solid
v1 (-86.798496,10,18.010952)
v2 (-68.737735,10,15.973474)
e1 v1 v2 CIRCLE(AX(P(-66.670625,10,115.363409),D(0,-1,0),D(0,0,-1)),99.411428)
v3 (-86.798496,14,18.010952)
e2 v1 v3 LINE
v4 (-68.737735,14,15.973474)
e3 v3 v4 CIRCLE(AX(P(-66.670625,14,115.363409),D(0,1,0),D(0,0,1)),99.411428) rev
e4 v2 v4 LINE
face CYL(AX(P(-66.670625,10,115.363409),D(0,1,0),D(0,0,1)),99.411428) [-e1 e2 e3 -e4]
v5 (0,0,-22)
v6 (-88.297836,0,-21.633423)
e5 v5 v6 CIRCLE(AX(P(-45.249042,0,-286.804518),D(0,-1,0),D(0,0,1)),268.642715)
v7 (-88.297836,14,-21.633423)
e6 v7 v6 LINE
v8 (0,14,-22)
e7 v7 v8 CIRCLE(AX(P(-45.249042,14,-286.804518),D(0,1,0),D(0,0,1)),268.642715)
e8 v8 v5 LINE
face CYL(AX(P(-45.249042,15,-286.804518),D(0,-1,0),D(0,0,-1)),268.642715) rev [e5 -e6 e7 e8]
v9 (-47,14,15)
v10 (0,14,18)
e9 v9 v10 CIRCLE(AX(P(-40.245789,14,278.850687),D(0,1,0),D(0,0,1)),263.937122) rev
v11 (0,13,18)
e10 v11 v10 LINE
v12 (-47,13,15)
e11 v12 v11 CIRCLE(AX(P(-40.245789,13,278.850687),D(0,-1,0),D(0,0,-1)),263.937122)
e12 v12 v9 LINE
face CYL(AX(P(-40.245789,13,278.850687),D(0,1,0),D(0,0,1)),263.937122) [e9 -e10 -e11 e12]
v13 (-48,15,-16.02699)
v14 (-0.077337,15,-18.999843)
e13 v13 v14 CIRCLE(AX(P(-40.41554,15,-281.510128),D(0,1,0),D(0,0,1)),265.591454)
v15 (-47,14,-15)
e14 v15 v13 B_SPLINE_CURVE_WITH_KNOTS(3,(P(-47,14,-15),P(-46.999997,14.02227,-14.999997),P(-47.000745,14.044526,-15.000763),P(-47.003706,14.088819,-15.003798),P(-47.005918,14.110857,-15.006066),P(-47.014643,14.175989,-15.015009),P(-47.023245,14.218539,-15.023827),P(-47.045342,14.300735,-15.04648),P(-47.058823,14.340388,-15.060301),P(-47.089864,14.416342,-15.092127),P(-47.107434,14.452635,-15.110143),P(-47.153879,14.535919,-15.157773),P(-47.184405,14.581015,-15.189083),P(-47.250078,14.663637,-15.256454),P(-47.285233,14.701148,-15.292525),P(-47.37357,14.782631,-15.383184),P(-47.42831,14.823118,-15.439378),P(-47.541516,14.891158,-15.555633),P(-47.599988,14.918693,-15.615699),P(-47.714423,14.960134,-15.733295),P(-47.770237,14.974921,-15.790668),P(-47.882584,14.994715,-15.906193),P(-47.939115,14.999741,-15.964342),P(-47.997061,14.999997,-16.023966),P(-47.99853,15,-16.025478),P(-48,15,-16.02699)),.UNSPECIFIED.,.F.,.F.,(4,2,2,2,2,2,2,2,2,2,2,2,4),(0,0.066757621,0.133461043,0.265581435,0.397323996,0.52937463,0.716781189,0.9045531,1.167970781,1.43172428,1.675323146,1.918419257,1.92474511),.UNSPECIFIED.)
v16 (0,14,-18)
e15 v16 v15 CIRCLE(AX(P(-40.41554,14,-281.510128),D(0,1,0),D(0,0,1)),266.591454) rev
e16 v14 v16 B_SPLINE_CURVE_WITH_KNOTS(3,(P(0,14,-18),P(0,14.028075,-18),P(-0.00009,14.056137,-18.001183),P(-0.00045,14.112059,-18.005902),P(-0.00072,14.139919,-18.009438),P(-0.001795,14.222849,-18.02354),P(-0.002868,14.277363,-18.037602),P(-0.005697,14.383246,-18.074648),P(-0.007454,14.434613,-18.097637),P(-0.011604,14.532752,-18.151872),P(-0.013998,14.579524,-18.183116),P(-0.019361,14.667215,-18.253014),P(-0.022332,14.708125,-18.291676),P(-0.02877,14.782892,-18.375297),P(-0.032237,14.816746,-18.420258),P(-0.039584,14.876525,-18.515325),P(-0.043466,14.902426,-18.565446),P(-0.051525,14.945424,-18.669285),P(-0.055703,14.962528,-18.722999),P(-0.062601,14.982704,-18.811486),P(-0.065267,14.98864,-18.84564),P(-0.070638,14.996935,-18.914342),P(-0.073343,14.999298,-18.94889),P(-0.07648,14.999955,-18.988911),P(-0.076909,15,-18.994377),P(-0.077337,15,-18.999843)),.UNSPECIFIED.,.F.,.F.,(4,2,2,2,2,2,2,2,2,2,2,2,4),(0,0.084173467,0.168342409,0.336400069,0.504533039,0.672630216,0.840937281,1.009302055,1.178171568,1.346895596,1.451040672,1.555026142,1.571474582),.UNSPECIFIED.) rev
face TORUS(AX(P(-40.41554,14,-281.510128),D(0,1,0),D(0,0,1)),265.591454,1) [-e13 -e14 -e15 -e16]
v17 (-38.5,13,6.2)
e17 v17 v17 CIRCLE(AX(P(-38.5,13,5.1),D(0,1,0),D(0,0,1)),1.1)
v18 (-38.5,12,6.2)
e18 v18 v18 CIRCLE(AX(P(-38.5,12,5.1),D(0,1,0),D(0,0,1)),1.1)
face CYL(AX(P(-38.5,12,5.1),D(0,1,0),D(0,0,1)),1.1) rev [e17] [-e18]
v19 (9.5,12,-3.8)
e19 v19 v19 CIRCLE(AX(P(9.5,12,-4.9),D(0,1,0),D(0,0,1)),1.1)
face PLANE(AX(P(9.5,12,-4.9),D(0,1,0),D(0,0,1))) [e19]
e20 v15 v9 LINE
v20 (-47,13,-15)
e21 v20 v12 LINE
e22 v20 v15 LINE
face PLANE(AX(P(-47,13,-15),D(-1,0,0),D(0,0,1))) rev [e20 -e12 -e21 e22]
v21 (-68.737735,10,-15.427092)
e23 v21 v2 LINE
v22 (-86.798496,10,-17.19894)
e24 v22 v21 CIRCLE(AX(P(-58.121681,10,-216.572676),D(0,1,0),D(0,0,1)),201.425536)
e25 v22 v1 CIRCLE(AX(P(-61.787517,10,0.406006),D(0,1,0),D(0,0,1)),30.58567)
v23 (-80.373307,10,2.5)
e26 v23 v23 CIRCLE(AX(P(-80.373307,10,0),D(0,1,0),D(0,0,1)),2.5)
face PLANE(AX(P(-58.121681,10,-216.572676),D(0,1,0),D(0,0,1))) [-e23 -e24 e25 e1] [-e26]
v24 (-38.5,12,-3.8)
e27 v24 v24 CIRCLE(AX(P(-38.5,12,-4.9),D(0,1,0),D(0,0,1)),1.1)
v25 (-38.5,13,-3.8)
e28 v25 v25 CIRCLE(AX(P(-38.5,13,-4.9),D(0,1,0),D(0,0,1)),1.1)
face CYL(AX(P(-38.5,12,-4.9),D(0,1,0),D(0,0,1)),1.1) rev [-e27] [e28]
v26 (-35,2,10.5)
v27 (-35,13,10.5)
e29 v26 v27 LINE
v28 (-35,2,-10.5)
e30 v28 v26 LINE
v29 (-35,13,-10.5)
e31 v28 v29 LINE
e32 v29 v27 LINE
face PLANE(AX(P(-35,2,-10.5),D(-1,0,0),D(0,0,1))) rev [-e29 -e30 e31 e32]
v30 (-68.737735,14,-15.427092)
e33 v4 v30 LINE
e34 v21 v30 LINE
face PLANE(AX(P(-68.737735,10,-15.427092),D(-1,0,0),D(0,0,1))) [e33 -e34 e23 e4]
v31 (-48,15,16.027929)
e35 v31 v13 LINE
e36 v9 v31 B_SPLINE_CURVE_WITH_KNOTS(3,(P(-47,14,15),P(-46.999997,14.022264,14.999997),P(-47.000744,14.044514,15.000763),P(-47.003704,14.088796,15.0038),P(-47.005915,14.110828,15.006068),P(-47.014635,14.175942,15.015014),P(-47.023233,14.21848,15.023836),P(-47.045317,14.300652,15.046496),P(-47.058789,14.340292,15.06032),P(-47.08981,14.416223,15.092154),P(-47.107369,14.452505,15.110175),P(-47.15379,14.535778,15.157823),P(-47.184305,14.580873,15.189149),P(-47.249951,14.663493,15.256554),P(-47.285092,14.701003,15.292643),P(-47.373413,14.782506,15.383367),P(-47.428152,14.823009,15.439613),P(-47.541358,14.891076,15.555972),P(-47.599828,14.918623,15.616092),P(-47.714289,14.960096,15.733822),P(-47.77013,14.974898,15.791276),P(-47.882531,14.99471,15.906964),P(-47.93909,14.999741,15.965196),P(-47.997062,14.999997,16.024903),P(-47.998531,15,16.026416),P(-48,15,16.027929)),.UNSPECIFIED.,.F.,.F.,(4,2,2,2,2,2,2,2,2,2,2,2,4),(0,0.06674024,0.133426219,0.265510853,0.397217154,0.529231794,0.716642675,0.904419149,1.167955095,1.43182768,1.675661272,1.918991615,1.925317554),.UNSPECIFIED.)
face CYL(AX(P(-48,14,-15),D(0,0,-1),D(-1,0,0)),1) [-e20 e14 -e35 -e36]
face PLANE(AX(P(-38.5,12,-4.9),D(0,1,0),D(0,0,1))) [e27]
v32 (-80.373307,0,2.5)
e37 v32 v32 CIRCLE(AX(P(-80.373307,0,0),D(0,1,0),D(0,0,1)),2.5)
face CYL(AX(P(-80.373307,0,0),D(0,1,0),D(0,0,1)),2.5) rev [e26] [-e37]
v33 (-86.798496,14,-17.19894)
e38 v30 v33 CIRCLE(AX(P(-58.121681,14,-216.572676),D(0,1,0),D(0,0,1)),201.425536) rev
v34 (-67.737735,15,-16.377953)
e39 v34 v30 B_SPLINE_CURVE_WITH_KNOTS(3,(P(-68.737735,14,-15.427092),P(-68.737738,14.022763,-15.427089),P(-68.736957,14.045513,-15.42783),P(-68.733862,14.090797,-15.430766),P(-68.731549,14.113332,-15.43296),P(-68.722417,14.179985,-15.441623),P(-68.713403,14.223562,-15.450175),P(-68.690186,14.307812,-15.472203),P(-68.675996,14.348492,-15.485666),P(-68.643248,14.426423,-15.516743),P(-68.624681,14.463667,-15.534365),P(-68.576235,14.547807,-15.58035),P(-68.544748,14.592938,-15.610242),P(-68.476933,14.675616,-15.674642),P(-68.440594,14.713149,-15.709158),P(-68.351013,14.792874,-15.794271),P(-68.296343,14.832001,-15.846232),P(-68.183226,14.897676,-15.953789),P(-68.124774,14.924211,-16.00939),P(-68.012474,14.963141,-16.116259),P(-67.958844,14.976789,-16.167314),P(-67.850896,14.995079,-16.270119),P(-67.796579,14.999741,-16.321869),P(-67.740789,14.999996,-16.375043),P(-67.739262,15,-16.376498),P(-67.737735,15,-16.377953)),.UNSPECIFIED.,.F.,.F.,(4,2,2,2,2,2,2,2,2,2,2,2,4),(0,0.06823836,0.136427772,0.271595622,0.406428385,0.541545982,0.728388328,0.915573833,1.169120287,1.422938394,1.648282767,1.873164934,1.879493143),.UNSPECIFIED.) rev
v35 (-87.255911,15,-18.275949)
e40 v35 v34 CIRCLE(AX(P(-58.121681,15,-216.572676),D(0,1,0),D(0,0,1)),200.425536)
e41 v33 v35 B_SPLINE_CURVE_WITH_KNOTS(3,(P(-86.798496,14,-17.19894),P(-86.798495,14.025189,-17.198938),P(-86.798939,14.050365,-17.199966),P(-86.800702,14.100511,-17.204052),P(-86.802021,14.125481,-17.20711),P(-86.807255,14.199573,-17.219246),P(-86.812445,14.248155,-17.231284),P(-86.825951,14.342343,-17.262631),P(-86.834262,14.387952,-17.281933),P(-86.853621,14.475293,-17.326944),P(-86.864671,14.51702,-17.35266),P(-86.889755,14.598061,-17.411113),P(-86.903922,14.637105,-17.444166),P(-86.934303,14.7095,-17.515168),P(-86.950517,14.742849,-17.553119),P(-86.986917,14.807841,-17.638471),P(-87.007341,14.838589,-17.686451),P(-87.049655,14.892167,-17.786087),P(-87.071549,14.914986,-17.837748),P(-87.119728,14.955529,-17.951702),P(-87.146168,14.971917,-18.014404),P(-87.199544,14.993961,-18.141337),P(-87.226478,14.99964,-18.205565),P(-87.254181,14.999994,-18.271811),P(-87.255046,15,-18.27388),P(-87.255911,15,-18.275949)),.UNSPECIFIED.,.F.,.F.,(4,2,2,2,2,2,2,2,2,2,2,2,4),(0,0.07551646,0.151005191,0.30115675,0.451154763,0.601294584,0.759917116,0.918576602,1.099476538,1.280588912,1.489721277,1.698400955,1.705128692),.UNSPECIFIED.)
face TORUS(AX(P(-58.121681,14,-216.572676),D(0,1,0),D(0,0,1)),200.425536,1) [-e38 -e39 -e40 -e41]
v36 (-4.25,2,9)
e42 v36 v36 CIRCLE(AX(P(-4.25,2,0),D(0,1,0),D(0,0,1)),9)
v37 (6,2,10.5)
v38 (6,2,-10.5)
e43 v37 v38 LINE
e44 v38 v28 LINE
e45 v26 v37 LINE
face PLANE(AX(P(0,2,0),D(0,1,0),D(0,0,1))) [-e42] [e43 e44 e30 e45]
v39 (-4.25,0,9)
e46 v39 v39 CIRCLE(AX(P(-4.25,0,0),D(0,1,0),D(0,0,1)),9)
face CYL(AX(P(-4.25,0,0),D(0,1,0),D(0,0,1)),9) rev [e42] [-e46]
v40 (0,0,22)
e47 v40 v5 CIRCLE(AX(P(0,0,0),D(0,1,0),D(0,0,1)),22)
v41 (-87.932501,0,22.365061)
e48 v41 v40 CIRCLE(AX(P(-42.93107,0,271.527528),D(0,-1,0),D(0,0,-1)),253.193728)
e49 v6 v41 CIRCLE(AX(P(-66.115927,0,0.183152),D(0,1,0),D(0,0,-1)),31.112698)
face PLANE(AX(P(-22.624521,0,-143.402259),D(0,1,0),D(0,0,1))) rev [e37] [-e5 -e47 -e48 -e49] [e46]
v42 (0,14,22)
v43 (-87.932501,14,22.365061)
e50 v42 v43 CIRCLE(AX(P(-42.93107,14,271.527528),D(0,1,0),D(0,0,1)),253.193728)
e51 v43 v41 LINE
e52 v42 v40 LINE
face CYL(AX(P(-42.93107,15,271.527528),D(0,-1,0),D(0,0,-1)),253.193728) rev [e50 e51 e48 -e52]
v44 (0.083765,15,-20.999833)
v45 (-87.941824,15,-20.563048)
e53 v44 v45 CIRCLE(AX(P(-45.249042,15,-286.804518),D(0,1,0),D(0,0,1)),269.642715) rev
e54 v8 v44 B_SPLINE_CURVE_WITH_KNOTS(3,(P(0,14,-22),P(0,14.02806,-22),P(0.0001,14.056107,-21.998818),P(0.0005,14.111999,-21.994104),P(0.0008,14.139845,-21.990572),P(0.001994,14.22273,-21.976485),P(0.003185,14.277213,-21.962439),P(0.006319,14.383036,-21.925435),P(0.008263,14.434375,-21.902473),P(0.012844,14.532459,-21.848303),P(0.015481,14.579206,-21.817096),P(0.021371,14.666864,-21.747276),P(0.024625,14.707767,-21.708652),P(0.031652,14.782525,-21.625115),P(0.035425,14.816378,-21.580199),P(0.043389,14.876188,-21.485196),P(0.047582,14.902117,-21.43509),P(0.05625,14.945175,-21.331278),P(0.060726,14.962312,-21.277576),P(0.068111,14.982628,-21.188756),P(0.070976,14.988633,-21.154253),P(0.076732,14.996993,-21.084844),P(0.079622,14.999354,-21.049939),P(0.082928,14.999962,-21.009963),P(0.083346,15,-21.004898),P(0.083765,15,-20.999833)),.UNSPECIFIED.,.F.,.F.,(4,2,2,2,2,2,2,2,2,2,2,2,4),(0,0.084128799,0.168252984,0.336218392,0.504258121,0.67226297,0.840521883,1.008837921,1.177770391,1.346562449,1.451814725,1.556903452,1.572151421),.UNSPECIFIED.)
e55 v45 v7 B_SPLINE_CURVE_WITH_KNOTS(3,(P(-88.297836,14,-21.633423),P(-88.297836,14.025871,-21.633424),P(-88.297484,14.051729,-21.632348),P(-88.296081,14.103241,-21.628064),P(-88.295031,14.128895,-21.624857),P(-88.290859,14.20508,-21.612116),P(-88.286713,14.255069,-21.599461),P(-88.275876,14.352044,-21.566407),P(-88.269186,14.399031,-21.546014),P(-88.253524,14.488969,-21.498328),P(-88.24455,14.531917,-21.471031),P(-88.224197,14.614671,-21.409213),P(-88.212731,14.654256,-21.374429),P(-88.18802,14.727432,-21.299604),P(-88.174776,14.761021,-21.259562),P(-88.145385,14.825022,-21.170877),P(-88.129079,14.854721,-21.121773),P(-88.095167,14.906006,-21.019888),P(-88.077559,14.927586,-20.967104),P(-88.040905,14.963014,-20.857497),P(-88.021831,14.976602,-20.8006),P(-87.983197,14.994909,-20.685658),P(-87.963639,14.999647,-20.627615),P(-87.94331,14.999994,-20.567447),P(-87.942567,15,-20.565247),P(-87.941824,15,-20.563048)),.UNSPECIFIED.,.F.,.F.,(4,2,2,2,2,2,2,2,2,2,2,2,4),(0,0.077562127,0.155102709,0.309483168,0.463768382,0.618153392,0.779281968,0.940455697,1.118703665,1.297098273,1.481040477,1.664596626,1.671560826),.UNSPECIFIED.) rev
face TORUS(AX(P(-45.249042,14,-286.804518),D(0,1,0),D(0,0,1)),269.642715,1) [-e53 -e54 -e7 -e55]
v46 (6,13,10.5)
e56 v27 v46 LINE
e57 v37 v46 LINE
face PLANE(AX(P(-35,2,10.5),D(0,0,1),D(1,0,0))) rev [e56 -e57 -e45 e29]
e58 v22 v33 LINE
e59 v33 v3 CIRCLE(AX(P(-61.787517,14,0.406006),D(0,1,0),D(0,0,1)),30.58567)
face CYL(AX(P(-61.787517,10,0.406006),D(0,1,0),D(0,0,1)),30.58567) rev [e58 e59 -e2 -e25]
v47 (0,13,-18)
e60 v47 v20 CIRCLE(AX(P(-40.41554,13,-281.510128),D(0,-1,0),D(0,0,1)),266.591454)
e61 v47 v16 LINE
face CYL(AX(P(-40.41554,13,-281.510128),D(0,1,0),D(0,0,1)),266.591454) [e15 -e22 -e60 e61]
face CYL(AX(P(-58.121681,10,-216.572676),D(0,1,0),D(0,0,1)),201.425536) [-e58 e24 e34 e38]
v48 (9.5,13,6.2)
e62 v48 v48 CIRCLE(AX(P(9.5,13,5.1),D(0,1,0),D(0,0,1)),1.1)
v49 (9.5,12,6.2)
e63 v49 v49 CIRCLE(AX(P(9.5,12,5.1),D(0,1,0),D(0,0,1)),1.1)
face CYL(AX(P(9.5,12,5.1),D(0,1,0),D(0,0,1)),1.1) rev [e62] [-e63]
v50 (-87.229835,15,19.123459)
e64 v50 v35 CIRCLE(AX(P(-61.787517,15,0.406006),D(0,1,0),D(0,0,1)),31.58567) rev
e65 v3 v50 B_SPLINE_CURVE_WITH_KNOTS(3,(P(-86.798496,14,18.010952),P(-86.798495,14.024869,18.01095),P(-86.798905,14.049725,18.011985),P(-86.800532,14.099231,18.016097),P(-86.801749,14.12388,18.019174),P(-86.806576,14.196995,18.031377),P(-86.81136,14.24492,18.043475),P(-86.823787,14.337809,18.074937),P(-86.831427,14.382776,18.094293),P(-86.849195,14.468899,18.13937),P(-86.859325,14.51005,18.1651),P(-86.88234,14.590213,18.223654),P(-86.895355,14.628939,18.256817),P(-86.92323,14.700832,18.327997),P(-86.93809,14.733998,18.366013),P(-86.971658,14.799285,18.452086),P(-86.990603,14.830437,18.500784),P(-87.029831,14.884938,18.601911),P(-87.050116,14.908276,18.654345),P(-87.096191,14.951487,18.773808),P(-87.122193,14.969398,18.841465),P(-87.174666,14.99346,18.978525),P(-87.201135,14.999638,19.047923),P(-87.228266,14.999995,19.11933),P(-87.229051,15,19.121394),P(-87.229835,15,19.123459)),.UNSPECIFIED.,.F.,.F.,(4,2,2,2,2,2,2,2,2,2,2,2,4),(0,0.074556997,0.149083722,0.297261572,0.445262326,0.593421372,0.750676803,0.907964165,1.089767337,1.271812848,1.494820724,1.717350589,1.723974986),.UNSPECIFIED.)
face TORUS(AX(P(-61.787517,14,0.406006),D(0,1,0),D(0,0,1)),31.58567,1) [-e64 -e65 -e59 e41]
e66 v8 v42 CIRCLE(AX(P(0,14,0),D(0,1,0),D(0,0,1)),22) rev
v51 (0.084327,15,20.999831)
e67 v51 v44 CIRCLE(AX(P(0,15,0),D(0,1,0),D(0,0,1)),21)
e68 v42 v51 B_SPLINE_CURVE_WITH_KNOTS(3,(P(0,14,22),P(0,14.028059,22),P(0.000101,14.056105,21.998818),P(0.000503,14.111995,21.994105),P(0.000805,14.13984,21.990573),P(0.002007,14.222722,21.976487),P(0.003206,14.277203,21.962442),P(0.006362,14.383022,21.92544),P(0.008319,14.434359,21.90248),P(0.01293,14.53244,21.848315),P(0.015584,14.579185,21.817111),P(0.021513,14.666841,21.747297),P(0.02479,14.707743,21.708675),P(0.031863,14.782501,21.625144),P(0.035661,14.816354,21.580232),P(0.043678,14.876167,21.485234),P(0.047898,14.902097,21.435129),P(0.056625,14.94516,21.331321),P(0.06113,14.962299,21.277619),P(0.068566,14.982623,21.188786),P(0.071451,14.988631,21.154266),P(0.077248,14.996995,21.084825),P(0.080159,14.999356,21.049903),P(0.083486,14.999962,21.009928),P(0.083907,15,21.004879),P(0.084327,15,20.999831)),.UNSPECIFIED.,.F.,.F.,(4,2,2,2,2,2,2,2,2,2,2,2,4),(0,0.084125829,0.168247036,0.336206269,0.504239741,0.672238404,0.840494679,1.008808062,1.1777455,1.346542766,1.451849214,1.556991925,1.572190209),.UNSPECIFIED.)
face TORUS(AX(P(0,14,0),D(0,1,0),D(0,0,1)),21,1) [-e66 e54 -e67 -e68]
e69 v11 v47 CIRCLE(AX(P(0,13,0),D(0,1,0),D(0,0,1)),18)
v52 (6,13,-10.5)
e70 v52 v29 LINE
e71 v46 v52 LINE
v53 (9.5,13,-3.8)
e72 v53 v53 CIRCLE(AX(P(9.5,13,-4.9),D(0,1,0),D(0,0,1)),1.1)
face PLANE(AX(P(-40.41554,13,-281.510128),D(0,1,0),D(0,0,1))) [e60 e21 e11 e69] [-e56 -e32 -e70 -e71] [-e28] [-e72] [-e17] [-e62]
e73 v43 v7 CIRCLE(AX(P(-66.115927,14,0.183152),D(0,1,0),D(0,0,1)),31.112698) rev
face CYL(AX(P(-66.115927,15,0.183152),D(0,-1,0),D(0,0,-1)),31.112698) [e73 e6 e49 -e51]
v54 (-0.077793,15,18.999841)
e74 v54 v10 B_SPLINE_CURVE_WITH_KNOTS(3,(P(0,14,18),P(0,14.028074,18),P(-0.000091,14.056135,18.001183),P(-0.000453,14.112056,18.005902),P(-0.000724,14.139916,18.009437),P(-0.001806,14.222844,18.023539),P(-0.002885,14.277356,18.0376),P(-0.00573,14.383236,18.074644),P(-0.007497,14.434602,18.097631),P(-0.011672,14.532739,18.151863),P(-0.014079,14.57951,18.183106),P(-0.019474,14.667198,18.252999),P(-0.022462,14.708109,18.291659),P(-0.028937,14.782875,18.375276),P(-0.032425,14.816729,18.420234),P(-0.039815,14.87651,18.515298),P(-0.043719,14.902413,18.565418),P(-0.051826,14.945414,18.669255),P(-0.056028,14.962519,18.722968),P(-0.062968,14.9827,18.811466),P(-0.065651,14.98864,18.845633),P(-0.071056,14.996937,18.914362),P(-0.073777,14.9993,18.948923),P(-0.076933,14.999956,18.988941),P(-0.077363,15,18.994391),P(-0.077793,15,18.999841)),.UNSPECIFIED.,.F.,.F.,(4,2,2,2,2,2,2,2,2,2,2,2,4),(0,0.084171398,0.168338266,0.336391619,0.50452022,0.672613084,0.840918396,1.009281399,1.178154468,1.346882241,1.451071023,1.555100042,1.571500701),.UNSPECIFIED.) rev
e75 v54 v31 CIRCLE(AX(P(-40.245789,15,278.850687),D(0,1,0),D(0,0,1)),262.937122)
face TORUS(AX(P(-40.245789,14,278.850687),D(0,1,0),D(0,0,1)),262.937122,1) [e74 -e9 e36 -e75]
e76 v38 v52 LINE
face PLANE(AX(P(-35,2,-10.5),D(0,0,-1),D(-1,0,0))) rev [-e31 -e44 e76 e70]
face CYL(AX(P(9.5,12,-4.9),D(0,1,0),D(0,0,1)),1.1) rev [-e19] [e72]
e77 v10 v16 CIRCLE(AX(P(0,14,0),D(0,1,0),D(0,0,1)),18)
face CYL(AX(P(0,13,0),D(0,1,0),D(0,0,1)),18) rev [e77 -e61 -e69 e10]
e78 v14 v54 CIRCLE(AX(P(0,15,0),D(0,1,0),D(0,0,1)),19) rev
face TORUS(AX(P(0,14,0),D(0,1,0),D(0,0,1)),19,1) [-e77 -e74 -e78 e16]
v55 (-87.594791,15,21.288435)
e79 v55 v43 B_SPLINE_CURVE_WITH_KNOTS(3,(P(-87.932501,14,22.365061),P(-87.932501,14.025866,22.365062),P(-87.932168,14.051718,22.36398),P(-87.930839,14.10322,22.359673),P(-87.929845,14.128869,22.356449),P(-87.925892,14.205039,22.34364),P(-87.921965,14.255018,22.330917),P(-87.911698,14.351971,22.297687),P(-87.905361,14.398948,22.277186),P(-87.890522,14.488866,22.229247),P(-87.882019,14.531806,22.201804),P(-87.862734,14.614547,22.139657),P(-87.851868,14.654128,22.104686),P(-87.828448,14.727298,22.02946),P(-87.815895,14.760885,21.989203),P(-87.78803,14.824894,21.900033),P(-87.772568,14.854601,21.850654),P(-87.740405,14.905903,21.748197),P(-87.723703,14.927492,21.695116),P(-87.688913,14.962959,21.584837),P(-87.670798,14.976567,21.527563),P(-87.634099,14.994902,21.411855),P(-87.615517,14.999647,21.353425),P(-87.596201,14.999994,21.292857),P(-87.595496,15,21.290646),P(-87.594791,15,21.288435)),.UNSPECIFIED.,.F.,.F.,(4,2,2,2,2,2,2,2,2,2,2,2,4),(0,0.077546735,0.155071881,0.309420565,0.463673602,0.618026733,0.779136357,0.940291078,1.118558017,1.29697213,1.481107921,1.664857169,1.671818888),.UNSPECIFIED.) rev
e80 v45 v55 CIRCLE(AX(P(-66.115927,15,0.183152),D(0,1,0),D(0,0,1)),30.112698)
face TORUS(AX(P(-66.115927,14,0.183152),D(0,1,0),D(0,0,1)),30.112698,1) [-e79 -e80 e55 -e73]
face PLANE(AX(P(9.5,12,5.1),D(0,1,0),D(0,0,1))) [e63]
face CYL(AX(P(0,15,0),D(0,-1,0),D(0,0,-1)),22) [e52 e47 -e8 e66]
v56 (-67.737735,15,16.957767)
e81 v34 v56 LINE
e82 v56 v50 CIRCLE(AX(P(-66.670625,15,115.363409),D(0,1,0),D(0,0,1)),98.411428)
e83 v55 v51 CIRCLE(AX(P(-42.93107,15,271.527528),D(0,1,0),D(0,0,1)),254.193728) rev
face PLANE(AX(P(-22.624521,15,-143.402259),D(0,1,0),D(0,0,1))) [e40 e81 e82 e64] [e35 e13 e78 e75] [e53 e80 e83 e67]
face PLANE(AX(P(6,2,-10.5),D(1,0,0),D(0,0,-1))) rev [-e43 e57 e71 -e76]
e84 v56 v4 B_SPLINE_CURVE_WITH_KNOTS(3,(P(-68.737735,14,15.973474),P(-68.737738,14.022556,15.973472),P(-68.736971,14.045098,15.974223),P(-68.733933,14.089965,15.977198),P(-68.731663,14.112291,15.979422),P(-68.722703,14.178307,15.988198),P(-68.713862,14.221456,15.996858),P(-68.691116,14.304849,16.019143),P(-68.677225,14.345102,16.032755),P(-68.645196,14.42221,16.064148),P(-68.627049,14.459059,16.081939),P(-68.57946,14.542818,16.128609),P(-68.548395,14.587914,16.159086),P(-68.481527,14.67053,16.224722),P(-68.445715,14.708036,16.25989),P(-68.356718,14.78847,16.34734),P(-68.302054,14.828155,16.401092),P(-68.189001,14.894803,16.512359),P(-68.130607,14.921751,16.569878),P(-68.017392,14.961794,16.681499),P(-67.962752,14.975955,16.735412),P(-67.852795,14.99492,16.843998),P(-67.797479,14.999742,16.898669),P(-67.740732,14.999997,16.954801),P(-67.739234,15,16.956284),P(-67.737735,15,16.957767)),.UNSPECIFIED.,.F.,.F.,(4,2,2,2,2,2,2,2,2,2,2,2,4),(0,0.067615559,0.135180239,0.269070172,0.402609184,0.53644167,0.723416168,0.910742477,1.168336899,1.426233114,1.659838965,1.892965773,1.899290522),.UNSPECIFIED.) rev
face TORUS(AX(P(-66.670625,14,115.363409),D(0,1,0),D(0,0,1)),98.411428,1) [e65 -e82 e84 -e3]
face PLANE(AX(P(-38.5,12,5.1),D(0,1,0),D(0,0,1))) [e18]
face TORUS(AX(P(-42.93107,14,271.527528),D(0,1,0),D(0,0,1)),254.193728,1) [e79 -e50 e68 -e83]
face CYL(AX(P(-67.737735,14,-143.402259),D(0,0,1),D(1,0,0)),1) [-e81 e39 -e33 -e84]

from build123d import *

# Parameters (mm, degrees)
SALIENTE_EXTRUIR1_DEPTH = 15
CORTAR_EXTRUIR2_DEPTH   = 2
CROQUIS3_W              = 41
CROQUIS3_H              = 21
CORTAR_EXTRUIR3_DEPTH   = 11
CROQUIS4_R              = 9
CORTAR_EXTRUIR4_DEPTH   = 101.611139972
CROQUIS5_R              = 1.1
CORTAR_EXTRUIR5_DEPTH   = 1
CORTAR_EXTRUIR13_DEPTH  = 5
CROQUIS7_R              = 2.5
CORTAR_EXTRUIR14_DEPTH  = 101.267649251
REDONDEO2_R             = 1
REDONDEO3_R             = 1


with BuildPart() as part:
    # Croquis1 → Saliente-Extruir1 (new body)
    with BuildSketch(Plane(origin=(0, 0, 0), x_dir=(1, 0, 0), z_dir=(0, 1, 0))):
        with BuildLine():
            ThreePointArc((0, -22), (22, 0), (0, 22))
            ThreePointArc((0, 22), (-44.133753746, 18.164117738), (-88.297835717, 21.633422586))
            ThreePointArc((-88.297835717, 21.633422586), (-97.227552655, -0.44148233), (-87.932501095, -22.365060691))
            ThreePointArc((-87.932501095, -22.365060691), (-43.982219883, -18.335981845), (0, -22))
        make_face()
    extrude(amount=SALIENTE_EXTRUIR1_DEPTH)

    # Croquis2 → Cortar-Extruir2 (cut)
    with BuildSketch(Plane(origin=(0, 15, 0), x_dir=(1, 0, 0), z_dir=(0, 1, 0))):
        with BuildLine():
            Line((-47, 15), (-47, -15))
            ThreePointArc((-47, -15), (-23.432953151, -15.449599362), (0, -18))
            ThreePointArc((0, -18), (18, 0), (0, 18))
            ThreePointArc((0, 18), (-23.433623339, 15.460098979), (-47, 15))
        make_face()
    extrude(amount=-CORTAR_EXTRUIR2_DEPTH, mode=Mode.SUBTRACT)

    # Croquis3 → Cortar-Extruir3 (cut)
    with BuildSketch(Plane(origin=(0, 13, 0), x_dir=(1, 0, 0), z_dir=(0, 1, 0))):
        with Locations((-14.5, 0)):
            Rectangle(CROQUIS3_W, CROQUIS3_H)
    extrude(amount=-CORTAR_EXTRUIR3_DEPTH, mode=Mode.SUBTRACT)

    # Croquis4 → Cortar-Extruir4 (cut, through all)
    with BuildSketch(Plane(origin=(0, 2, 0), x_dir=(1, 0, 0), z_dir=(0, 1, 0))):
        with Locations(Location((-4.25, 0, 0), (0, 0, 270))):
            Circle(CROQUIS4_R)
    extrude(amount=-CORTAR_EXTRUIR4_DEPTH, mode=Mode.SUBTRACT)

    # Croquis5 → Cortar-Extruir5 (cut)
    with BuildSketch(Plane(origin=(0, 13, 0), x_dir=(1, 0, 0), z_dir=(0, 1, 0))):
        with Locations(Location((9.5, 4.9, 0), (0, 0, 270))):
            Circle(CROQUIS5_R)
        with Locations(Location((9.5, -5.1, 0), (0, 0, 270))):
            Circle(CROQUIS5_R)
        with Locations(Location((-38.5, 4.9, 0), (0, 0, 270))):
            Circle(CROQUIS5_R)
        with Locations(Location((-38.5, -5.1, 0), (0, 0, 270))):
            Circle(CROQUIS5_R)
    extrude(amount=-CORTAR_EXTRUIR5_DEPTH, mode=Mode.SUBTRACT)

    # Croquis6 → Cortar-Extruir13 (cut)
    with BuildSketch(Plane(origin=(0, 15, 0), x_dir=(1, 0, 0), z_dir=(0, 1, 0))):
        with BuildLine():
            Line((-68.737734773, 15.427092138), (-68.737734773, -15.97347445))
            ThreePointArc((-68.737734773, -15.97347445), (-77.814777004, -16.578592838), (-86.798496184, -18.010952302))
            ThreePointArc((-86.798496184, -18.010952302), (-92.373186804, -0.406006346), (-86.798496184, 17.198939611))
            ThreePointArc((-86.798496184, 17.198939611), (-77.788079973, 16.109514175), (-68.737734773, 15.427092138))
        make_face()
    extrude(amount=-CORTAR_EXTRUIR13_DEPTH, mode=Mode.SUBTRACT)

    # Croquis7 → Cortar-Extruir14 (cut, through all)
    with BuildSketch(Plane(origin=(0, 10, 0), x_dir=(1, 0, 0), z_dir=(0, 1, 0))):
        with Locations(Location((-80.373306938, 0, 0), (0, 0, 270))):
            Circle(CROQUIS7_R)
    extrude(amount=-CORTAR_EXTRUIR14_DEPTH, mode=Mode.SUBTRACT)

    # Redondeo2
    # the kernel refuses this fillet: 1 mm, written as the material it takes off along each edge
    with BuildSketch(Plane(origin=(-42.931069519, 15, 271.527527752), x_dir=(-0.1874431998722677, 0, -0.9822754434585266), z_dir=(-0.9822754434585266, 0, 0.1874431998722677))) as redondeo2_piece_1:
        with BuildLine():
            CenterArc((253.193727877 + REDONDEO2_R, REDONDEO2_R), REDONDEO2_R, 180, 90)
            Line((253.193727877 + REDONDEO2_R, 0), (253.193727877, 0))
            Line((253.193727877, 0), (253.193727877, REDONDEO2_R))
        make_face()
    revolve(axis=Axis((-42.931069519, 15, 271.527527752), (0, -1, 0)), revolution_arc=21.131483712, mode=Mode.SUBTRACT)
    with BuildSketch(Plane(origin=(0, 15, 0), x_dir=(-0.11357352107267706, 0, 0.9935295945824433), z_dir=(-0.9935295945824433, 0, -0.11357352107267706))) as redondeo2_piece_2:
        with BuildLine():
            CenterArc((22 - REDONDEO2_R, -REDONDEO2_R), REDONDEO2_R, 0, 90)
            Line((22 - REDONDEO2_R, 0), (22, 0))
            Line((22, 0), (22, -REDONDEO2_R))
        make_face()
    revolve(axis=Axis((0, 15, 0), (0, 1, 0)), revolution_arc=193.042709536, mode=Mode.SUBTRACT)
    with BuildSketch(Plane(origin=(-45.249041595, 15, -286.804517852), x_dir=(0.17760158469161672, 0, 0.9841024728731386), z_dir=(0.9841024728731386, 0, -0.17760158469161672))) as redondeo2_piece_3:
        with BuildLine():
            CenterArc((268.642715219 + REDONDEO2_R, REDONDEO2_R), REDONDEO2_R, 180, 90)
            Line((268.642715219, REDONDEO2_R), (268.642715219, 0))
            Line((268.642715219, 0), (268.642715219 + REDONDEO2_R, 0))
        make_face()
    revolve(axis=Axis((-45.249041595, 15, -286.804517852), (0, -1, 0)), revolution_arc=19.984444172, mode=Mode.SUBTRACT)
    with BuildSketch(Plane(origin=(-66.115926768, 15, 0.183151741), x_dir=(-0.6543449081005462, 0, -0.7561962319681894), z_dir=(0.7561962319681894, 0, -0.6543449081005462))) as redondeo2_piece_4:
        with BuildLine():
            CenterArc((31.112698372 - REDONDEO2_R, -REDONDEO2_R), REDONDEO2_R, 0, 90)
            Line((31.112698372 - REDONDEO2_R, 0), (31.112698372, 0))
            Line((31.112698372, 0), (31.112698372, -REDONDEO2_R))
        make_face()
    revolve(axis=Axis((-66.115926768, 15, 0.183151741), (0, 1, 0)), revolution_arc=99.211479347, mode=Mode.SUBTRACT)

    # Redondeo3
    redondeo3_edges = [part.edges().sort_by_distance(p)[0] for p in [
        (-23.433623339, 15, -15.460098979),
        (-47, 15, 0),
        (-23.432953151, 15, 15.449599362),
        (18, 15, 0),
        (-77.788079973, 15, -16.109514175),
        (-68.737734773, 15, 0.273191156),
        (-92.373186804, 15, 0.406006346),
        (-77.814777004, 15, 16.578592838),
    ]]
    fillet(redondeo3_edges, radius=REDONDEO3_R)


solid = part.part
